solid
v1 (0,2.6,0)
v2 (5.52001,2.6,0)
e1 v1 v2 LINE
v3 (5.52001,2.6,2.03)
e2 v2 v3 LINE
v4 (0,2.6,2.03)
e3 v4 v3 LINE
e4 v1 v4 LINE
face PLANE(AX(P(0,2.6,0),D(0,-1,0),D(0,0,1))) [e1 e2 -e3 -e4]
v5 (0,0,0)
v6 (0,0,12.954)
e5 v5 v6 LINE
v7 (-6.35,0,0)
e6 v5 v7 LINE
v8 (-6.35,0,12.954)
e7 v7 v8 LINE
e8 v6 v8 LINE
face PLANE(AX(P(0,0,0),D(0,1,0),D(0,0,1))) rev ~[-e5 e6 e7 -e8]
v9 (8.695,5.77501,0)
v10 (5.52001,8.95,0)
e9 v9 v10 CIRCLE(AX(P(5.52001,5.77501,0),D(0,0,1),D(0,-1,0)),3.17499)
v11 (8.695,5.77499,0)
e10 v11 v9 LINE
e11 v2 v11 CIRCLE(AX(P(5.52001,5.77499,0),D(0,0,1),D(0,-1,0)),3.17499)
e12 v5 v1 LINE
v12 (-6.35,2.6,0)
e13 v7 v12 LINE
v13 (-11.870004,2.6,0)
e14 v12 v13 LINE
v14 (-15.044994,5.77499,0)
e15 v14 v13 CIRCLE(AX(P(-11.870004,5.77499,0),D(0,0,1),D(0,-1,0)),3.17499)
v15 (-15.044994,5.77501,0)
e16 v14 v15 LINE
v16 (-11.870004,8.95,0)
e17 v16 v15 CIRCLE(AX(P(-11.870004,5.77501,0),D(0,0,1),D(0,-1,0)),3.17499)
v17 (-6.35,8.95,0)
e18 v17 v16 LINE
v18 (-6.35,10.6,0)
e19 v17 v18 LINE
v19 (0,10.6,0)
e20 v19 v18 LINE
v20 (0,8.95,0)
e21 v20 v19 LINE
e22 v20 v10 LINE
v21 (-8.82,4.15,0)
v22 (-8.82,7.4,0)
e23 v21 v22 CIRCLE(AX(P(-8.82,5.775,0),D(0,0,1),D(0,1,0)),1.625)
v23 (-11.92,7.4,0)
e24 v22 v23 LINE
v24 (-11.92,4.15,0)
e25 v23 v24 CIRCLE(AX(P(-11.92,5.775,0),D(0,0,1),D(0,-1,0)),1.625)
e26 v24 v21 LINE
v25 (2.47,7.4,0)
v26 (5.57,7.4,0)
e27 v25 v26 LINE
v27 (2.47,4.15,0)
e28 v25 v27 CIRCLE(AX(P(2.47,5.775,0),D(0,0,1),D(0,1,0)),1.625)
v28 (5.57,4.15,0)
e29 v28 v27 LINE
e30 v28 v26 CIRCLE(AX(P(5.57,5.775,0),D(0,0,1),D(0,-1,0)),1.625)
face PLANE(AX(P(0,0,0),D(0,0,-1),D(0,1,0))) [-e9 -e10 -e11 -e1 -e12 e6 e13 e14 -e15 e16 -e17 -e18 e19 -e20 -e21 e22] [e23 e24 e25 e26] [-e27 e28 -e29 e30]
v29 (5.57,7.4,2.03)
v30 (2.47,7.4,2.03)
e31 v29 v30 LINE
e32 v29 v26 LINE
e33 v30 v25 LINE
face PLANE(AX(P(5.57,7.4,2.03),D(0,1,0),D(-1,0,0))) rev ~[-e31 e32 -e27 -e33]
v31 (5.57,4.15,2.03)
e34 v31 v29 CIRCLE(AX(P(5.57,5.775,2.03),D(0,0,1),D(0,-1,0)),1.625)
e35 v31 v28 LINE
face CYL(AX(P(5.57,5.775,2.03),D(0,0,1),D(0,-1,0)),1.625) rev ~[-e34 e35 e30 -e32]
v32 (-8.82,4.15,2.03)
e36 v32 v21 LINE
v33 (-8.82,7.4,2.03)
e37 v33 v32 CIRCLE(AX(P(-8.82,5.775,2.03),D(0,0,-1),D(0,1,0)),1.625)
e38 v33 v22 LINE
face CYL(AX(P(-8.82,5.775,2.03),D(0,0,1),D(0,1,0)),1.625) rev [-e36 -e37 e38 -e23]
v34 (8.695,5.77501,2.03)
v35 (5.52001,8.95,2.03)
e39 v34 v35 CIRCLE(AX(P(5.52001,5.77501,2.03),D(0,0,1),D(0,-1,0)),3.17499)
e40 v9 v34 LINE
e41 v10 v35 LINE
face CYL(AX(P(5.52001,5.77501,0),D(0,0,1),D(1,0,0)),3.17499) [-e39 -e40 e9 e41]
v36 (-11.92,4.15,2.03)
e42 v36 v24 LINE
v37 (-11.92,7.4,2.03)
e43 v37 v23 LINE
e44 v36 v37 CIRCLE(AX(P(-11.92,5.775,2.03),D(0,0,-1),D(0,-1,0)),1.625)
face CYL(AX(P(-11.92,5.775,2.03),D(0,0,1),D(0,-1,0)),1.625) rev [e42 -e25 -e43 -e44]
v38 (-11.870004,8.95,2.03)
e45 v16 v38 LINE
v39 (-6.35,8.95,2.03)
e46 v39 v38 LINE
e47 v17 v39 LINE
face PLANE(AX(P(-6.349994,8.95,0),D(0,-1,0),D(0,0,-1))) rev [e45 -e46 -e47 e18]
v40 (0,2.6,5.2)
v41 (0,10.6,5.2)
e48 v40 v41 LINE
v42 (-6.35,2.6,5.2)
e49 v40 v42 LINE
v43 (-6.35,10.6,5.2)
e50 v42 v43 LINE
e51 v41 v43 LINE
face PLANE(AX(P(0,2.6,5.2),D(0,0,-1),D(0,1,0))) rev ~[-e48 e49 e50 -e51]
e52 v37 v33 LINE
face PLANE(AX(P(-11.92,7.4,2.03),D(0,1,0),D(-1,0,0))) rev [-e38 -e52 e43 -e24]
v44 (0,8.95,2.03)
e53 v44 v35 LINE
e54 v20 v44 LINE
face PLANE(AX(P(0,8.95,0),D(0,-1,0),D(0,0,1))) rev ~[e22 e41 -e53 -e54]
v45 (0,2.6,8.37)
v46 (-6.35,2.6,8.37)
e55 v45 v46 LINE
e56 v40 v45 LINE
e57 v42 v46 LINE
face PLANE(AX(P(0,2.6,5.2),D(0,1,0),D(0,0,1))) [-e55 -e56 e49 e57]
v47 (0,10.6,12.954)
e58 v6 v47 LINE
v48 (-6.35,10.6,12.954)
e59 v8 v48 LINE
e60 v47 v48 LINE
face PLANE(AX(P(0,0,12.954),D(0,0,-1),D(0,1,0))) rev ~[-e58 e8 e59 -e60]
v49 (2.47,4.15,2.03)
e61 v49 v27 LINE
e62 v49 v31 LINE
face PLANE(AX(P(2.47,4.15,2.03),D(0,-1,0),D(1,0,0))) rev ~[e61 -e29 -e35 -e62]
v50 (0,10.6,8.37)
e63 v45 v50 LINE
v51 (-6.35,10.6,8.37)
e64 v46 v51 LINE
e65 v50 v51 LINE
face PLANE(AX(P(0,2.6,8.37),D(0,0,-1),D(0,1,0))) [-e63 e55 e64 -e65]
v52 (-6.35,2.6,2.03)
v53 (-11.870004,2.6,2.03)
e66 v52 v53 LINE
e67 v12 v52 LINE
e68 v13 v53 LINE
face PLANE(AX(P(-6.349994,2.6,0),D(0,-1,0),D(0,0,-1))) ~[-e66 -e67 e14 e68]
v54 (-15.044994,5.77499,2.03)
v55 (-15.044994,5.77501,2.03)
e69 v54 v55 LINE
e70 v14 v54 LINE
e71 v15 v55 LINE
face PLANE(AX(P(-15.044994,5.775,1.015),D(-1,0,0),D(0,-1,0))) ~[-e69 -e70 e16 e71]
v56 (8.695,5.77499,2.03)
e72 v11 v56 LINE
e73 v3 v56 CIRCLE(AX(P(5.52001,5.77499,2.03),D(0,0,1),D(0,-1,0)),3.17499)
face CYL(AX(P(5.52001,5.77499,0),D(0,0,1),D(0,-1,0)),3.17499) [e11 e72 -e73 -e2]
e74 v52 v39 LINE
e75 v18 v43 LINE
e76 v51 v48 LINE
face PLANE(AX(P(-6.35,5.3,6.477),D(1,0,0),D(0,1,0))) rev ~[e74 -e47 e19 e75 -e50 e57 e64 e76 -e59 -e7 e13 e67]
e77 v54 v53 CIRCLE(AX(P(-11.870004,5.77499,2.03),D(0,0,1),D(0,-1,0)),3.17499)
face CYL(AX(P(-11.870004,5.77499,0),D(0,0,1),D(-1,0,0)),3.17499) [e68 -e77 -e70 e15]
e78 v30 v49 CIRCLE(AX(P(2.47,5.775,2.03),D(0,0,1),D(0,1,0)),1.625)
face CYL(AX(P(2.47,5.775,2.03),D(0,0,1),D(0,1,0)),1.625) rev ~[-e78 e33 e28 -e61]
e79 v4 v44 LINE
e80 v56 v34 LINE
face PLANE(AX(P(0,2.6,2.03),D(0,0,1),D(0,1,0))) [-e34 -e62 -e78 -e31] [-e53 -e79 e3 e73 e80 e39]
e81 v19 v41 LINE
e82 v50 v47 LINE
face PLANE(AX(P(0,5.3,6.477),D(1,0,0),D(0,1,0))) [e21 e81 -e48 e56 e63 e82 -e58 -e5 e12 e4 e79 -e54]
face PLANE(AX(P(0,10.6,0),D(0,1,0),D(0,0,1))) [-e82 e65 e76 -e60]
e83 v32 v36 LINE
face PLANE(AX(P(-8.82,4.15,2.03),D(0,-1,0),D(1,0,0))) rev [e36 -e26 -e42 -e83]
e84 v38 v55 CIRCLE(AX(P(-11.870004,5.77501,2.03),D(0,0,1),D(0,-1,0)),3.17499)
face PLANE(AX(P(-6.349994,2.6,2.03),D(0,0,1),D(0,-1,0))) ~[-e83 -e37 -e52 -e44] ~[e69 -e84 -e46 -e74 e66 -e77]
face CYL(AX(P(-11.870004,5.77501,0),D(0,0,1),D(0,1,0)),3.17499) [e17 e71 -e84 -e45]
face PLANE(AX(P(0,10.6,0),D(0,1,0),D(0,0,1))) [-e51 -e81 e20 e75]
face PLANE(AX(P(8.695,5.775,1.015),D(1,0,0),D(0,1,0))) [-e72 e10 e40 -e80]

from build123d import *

# Parameters (mm, degrees)
F0_W     = 10.6
F0_H     = 12.954
F1_DEPTH = 6.35
F2_W     = 8
F2_H     = 3.17
F3_DEPTH = 6.351
F4_W     = 6.35
F4_H     = 2.03
F5_DEPTH = 8.695
F6_R     = 3.17499
F9_DEPTH = 2.031


# Not quite as in the source:
# - a fillet or chamfer is up to 0.001 mm smaller than in the source, because OpenCascade refuses the exact size
# - a pattern or mirror of a feature is missing from the dataset's text; its kind, count and spacing are read off the source's solid


with BuildPart() as f1:
    # F0 (on Right) → F1 (new body)
    with BuildSketch(Plane.YZ):
        with Locations((5.3, 6.477)):
            Rectangle(F0_W, F0_H)
    extrude(amount=-F1_DEPTH)

    # F2 (on face) → F3 (cut, through all)
    with BuildSketch(Plane.YZ):
        with Locations((6.6, 6.785)):
            Rectangle(F2_W, F2_H)
    extrude(amount=-F3_DEPTH, mode=Mode.SUBTRACT)

    # F4 (on face) → F5 (join)
    with BuildSketch(Plane.YZ):
        with Locations((5.775, 1.015)):
            Rectangle(F4_W, F4_H)
    f5 = extrude(amount=F5_DEPTH)

    # F5_copies: F5 across plane
    add(f5.mirror(Plane(origin=(-3.174997, 0, 0), x_dir=(0, 0, -1), z_dir=(-1, 0, 0))))

    # F6 (radius 3.175 in the source; OpenCascade refuses exactly that, so slightly less here)
    f6_edges = [f1.edges().sort_by_distance(p)[0] for p in [
        (8.695, 2.6, 1.015),
        (8.695, 8.95, 1.015),
        (-15.044994, 8.95, 1.015),
        (-15.044994, 2.6, 1.015),
    ]]
    fillet(f6_edges, radius=F6_R)

    # F8 (on face) → F9 (cut, through all)
    with BuildSketch(Plane.XY.offset(2.03)):
        with BuildLine():
            Line((2.47, 4.15), (5.57, 4.15))
            ThreePointArc((5.57, 4.15), (7.195, 5.775), (5.57, 7.4))
            Line((5.57, 7.4), (2.47, 7.4))
            ThreePointArc((2.47, 7.4), (0.845, 5.775), (2.47, 4.15))
        make_face()
    f9 = extrude(amount=-F9_DEPTH, mode=Mode.SUBTRACT)

    # F9_copies: F9 across plane
    add(f9.mirror(Plane(origin=(-3.175, 0, 0), x_dir=(0, 0, -1), z_dir=(-1, 0, 0))), mode=Mode.SUBTRACT)


solid = f1.part
